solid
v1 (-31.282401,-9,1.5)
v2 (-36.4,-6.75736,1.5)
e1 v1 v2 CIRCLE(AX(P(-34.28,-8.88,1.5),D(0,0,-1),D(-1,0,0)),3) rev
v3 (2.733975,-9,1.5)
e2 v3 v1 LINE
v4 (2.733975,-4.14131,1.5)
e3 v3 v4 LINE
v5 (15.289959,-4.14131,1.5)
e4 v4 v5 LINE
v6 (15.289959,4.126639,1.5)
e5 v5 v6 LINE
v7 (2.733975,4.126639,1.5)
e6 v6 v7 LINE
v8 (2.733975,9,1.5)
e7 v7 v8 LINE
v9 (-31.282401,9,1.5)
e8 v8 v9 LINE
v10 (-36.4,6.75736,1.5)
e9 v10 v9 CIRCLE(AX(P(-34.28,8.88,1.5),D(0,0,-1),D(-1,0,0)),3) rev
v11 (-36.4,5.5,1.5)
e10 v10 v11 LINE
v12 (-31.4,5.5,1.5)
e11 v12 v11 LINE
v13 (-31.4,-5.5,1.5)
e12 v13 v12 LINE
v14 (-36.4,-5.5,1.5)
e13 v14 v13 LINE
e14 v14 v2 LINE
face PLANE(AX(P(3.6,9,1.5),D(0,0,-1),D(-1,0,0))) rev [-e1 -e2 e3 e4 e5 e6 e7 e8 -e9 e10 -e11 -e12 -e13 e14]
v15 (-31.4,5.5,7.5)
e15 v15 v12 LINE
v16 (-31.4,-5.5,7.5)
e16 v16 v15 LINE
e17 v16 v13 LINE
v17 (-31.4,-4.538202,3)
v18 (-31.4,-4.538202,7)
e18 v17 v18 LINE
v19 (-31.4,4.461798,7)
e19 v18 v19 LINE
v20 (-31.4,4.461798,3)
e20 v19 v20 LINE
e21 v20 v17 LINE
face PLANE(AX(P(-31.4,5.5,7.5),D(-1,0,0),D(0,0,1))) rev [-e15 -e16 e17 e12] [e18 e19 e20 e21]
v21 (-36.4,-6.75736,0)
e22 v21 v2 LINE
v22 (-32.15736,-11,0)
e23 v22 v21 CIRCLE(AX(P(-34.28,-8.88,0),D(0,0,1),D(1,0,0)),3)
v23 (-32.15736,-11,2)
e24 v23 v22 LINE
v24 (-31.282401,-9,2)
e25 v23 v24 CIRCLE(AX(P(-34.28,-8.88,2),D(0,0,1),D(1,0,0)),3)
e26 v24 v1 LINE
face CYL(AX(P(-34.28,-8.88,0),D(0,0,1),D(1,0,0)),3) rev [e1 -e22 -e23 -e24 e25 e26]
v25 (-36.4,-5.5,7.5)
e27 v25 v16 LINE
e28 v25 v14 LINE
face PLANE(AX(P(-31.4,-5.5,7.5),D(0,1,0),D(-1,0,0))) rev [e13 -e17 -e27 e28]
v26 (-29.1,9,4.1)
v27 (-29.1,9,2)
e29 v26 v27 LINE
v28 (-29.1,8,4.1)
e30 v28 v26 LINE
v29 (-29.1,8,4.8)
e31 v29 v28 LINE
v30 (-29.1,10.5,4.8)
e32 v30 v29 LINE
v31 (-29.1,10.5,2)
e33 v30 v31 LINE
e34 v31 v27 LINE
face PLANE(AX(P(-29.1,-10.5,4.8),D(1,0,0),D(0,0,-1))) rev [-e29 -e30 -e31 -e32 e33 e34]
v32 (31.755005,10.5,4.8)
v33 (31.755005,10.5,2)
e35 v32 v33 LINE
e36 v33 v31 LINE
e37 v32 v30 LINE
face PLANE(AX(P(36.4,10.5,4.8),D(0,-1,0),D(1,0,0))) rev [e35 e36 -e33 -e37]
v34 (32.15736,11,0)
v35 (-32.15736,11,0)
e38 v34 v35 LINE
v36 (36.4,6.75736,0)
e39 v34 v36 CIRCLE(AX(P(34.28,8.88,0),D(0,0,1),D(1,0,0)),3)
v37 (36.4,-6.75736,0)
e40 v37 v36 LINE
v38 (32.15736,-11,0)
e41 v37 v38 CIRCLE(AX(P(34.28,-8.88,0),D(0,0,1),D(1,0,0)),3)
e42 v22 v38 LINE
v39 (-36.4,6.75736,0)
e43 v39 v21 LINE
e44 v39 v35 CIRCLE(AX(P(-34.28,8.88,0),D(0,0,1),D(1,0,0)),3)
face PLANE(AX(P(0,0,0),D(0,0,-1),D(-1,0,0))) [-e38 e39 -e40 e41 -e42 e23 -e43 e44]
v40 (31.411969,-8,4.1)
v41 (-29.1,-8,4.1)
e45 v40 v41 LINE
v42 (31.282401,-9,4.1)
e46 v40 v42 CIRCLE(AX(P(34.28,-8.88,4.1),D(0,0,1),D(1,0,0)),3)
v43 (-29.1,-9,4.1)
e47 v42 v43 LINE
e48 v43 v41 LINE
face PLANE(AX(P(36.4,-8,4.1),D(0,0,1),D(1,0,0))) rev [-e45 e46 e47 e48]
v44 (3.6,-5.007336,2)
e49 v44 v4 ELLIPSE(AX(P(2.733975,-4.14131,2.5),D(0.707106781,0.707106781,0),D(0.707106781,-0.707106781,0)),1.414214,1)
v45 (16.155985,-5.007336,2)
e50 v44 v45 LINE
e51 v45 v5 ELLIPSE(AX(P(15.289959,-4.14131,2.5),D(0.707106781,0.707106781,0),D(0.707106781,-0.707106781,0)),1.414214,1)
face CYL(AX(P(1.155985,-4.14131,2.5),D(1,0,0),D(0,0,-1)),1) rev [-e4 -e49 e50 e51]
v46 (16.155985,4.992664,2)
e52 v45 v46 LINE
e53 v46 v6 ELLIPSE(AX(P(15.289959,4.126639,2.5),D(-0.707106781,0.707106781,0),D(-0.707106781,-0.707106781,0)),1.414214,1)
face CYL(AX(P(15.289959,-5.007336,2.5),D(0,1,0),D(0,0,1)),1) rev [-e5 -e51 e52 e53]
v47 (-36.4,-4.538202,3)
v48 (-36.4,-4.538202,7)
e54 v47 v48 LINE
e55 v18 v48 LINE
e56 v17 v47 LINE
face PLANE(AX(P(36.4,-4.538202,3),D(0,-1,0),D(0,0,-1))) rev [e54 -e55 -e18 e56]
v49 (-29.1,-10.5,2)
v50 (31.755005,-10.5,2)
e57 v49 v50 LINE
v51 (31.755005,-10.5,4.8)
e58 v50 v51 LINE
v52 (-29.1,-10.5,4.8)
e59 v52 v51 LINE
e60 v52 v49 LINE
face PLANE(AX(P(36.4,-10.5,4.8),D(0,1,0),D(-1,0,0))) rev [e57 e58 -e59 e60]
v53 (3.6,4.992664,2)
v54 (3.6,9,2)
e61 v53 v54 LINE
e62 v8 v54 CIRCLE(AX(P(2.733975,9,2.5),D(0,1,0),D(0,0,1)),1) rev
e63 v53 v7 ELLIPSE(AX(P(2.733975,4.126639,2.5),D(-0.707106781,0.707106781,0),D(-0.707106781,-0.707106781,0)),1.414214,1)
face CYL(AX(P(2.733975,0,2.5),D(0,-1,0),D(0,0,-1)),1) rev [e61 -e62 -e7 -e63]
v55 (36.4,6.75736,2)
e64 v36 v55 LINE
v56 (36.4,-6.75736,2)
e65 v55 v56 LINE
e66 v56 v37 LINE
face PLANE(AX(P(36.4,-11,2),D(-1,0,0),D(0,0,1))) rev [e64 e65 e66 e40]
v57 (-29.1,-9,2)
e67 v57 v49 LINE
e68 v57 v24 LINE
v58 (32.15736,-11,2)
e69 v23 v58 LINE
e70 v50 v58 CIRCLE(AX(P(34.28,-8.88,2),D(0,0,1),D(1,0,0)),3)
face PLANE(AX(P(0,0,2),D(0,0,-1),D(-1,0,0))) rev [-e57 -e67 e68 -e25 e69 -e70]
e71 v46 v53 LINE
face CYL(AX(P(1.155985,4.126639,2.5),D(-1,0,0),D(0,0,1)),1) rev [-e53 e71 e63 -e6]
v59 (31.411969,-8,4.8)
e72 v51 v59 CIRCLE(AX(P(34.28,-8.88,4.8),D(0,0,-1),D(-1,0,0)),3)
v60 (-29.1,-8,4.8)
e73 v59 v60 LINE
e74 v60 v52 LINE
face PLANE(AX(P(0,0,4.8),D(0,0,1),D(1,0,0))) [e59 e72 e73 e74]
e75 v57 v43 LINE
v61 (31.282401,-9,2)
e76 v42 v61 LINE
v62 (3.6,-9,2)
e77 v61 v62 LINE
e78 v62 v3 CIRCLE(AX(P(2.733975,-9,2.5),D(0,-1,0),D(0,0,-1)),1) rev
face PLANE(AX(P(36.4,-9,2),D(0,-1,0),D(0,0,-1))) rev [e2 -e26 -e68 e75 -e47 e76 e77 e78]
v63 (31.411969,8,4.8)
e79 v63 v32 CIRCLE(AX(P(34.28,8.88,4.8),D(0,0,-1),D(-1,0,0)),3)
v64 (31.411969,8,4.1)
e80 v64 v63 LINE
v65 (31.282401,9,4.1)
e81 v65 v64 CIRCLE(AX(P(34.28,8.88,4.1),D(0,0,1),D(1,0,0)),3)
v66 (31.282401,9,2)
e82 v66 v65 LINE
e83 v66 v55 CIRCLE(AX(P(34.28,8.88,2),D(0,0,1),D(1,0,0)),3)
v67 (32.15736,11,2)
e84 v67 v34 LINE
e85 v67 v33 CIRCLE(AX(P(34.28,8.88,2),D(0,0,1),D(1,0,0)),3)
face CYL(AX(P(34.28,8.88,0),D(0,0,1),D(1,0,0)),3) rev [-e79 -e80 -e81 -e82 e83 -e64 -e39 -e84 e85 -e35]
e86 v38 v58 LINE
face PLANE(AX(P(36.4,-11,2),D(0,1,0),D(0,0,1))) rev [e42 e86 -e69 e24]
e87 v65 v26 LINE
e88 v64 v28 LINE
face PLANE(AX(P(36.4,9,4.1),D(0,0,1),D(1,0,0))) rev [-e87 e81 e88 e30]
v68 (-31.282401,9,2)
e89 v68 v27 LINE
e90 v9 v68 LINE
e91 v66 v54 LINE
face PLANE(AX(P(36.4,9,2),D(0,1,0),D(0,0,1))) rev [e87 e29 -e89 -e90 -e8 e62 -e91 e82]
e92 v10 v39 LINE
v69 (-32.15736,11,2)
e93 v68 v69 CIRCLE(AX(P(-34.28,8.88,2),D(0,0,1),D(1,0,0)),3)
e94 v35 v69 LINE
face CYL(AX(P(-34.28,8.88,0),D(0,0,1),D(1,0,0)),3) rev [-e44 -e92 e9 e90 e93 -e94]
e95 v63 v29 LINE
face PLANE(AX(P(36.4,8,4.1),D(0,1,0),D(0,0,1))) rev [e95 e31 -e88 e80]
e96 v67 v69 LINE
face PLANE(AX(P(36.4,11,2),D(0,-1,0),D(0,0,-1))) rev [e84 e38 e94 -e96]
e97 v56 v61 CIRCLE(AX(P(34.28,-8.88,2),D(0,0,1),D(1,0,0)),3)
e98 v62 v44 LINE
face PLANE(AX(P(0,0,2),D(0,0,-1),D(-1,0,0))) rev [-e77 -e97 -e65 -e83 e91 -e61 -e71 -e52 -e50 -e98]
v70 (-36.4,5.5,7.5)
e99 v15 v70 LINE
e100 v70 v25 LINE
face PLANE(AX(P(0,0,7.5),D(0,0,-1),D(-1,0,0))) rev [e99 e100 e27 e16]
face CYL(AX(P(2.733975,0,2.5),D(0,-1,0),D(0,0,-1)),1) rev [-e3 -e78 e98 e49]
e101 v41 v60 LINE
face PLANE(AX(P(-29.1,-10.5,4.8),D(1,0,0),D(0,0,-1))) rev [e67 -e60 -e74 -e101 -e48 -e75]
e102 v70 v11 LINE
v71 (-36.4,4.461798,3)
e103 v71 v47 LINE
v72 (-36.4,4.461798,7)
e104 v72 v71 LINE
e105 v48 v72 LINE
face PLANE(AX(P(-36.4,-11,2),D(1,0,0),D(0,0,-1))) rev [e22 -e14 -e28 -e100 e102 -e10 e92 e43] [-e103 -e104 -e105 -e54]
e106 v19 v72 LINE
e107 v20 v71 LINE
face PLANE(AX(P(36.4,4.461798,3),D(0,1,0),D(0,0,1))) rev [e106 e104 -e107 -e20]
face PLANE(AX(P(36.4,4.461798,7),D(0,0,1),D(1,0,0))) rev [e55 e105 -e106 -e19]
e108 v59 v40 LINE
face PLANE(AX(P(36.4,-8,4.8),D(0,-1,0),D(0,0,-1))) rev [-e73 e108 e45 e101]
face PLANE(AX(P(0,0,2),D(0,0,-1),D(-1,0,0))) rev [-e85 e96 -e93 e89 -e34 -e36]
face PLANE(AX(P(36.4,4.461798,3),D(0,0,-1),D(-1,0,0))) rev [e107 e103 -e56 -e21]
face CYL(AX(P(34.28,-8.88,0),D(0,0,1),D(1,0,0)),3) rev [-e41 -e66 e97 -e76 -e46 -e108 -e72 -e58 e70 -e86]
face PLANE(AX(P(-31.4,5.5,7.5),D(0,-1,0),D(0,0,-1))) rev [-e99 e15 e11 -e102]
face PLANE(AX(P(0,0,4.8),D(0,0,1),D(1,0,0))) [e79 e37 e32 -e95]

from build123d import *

# Parameters (mm, degrees)
SKIZZE1_W                       = 22
SKIZZE1_H                       = 72.8
AUFSATZ_LINEAR_AUSTRAGEN1_DEPTH = 2
SKIZZE2_R                       = 3
SCHNITT_LINEAR_AUSTRAGEN1_DEPTH = 2
SKIZZE3_W                       = 65.5
SKIZZE3_H                       = 21
AUFSATZ_LINEAR_AUSTRAGEN2_DEPTH = 2.8
SCHNITT_LINEAR_AUSTRAGEN2_DEPTH = 67.590464783
SKIZZE5_R                       = 3
SCHNITT_LINEAR_AUSTRAGEN4_DEPTH = 39.128729326
SKIZZE6_W                       = 18
SKIZZE6_H                       = 1
SCHNITT_LINEAR_AUSTRAGEN5_DEPTH = 40
SKIZZE8_W                       = 15
SKIZZE8_H                       = 10
SCHNITT_LINEAR_AUSTRAGEN6_DEPTH = 0.5
VERRUNDUNG3_R                   = 1
SKIZZE9_W                       = 5
SKIZZE9_H                       = 11
AUFSATZ_LINEAR_AUSTRAGEN3_DEPTH = 6
SKIZZE10_W                      = 9
SKIZZE10_H                      = 4
SCHNITT_LINEAR_AUSTRAGEN7_DEPTH = 75.007364498


with BuildPart() as part:
    # Skizze1 → Aufsatz-Linear austragen1 (new body)
    with BuildSketch(Plane(origin=(0, 0, 0), x_dir=(0, 1, 0), z_dir=(0, 0, 1))):
        Rectangle(SKIZZE1_W, SKIZZE1_H)
    extrude(amount=AUFSATZ_LINEAR_AUSTRAGEN1_DEPTH)

    # Skizze2 → Schnitt-Linear austragen1 (cut)
    with BuildSketch(Plane.XY.offset(2)):
        with Locations((-34.28, 8.88)):
            Circle(SKIZZE2_R)
        with Locations((-34.28, -8.88)):
            Circle(SKIZZE2_R)
        with Locations((34.28, -8.88)):
            Circle(SKIZZE2_R)
        with Locations((34.28, 8.88)):
            Circle(SKIZZE2_R)
    extrude(amount=-SCHNITT_LINEAR_AUSTRAGEN1_DEPTH, mode=Mode.SUBTRACT)

    # Skizze3 → Aufsatz-Linear austragen2 (add)
    with BuildSketch(Plane.XY.offset(2)):
        with Locations((3.65, 0)):
            Rectangle(SKIZZE3_W, SKIZZE3_H)
    extrude(amount=AUFSATZ_LINEAR_AUSTRAGEN2_DEPTH)

    # Skizze4 → Schnitt-Linear austragen2 (cut, through all)
    with BuildSketch(Plane(origin=(-29.1, 0, 0), x_dir=(0, -1, 0), z_dir=(-1, 0, 0))):
        Polygon((-8, 4.8), (8, 4.8), (8, 4.1), (9, 4.1), (9, 2), (-9, 2), (-9, 4.1), (-8, 4.1), align=None)
    extrude(amount=-SCHNITT_LINEAR_AUSTRAGEN2_DEPTH, mode=Mode.SUBTRACT)

    # Skizze5 → Schnitt-Linear austragen4 (cut, through all)
    with BuildSketch(Plane(origin=(0, 0, 2), x_dir=(1, 0, 0), z_dir=(0, 0, -1))):
        with Locations((34.28, -8.88)):
            Circle(SKIZZE5_R)
        with Locations((34.28, 8.88)):
            Circle(SKIZZE5_R)
    extrude(amount=-SCHNITT_LINEAR_AUSTRAGEN4_DEPTH, mode=Mode.SUBTRACT)

    # Skizze6 → Schnitt-Linear austragen5 (cut)
    with BuildSketch(Plane(origin=(-36.4, 0, 0), x_dir=(0, -1, 0), z_dir=(-1, 0, 0))):
        with Locations((0, 2)):
            Rectangle(SKIZZE6_W, SKIZZE6_H)
    extrude(amount=-SCHNITT_LINEAR_AUSTRAGEN5_DEPTH, mode=Mode.SUBTRACT)

    # Skizze8 → Schnitt-Linear austragen6 (cut)
    with BuildSketch(Plane.XY.offset(2)):
        with Locations((8.655984658, -0.007335612)):
            Rectangle(SKIZZE8_W, SKIZZE8_H)
    extrude(amount=-SCHNITT_LINEAR_AUSTRAGEN6_DEPTH, mode=Mode.SUBTRACT)

    # Verrundung3
    # the kernel refuses this fillet: 1 mm, written as the material it adds along each edge
    with BuildSketch(Plane(origin=(3.6, -9, 1.5), x_dir=(0, 0, 1), z_dir=(0, 1, 0))) as verrundung3_piece_1:
        with BuildLine():
            CenterArc((1, -0.866025404), VERRUNDUNG3_R, 120, 60)
            Line((0, -0.866025404), (-0.02, -0.866025404))
            Line((-0.02, -0.866025404), (-0.02, 0))
            Line((-0.02, 0), (0, 0.02))
            ThreePointArc((0, 0.02), (0.25, 0.02), (0.49, 0.017320508))
            Line((0.49, 0.017320508), (0.5, 0))
        make_face()
    extrude(amount=3.992664388)
    with BuildSketch(Plane(origin=(3.6, -5.007335612, 1.5), x_dir=(0, 0, 1), z_dir=(1, 0, 0)), Plane(origin=(16.155984658, 4.992664388, 1.5), x_dir=(0, 0, 1), z_dir=(-1, 0, 0))) as verrundung3_piece_2:
        with BuildLine():
            CenterArc((1, -0.866025404), VERRUNDUNG3_R, 120, 60)
            Line((0, -0.866025404), (-0.02, -0.866025404))
            Line((-0.02, -0.866025404), (-0.02, 0))
            Line((-0.02, 0), (0, 0.02))
            ThreePointArc((0, 0.02), (0.25, 0.02), (0.49, 0.017320508))
            Line((0.49, 0.017320508), (0.5, 0))
        make_face()
    extrude(amount=12.555984658)
    with BuildSketch(Plane(origin=(3.6, 4.992664388, 1.5), x_dir=(0, 0, 1), z_dir=(0, 1, 0))) as verrundung3_piece_3:
        with BuildLine():
            CenterArc((1, -0.866025404), VERRUNDUNG3_R, 120, 60)
            Line((0, -0.866025404), (-0.02, -0.866025404))
            Line((-0.02, -0.866025404), (-0.02, 0))
            Line((-0.02, 0), (0, 0.02))
            ThreePointArc((0, 0.02), (0.25, 0.02), (0.49, 0.017320508))
            Line((0.49, 0.017320508), (0.5, 0))
        make_face()
    extrude(amount=4.007335612)
    with BuildSketch(Plane(origin=(16.155984658, -5.007335612, 1.5), x_dir=(0, 0, 1), z_dir=(0, 1, 0))) as verrundung3_piece_4:
        with BuildLine():
            CenterArc((1, -0.866025404), VERRUNDUNG3_R, 120, 60)
            Line((0, -0.866025404), (-0.02, -0.866025404))
            Line((-0.02, -0.866025404), (-0.02, 0))
            Line((-0.02, 0), (0, 0.02))
            ThreePointArc((0, 0.02), (0.25, 0.02), (0.49, 0.017320508))
            Line((0.49, 0.017320508), (0.5, 0))
        make_face()
    extrude(amount=10)
    with BuildSketch(Plane(origin=(3.6, -9, 1.5), x_dir=(0, 0, 1), z_dir=(0, 1, 0))) as verrundung3_piece_5a_section:
        with BuildLine():
            CenterArc((1, -0.866025404), VERRUNDUNG3_R, 120, 60)
            Line((0, -0.866025404), (-0.02, -0.866025404))
            Line((-0.02, -0.866025404), (-0.02, 0))
            Line((-0.02, 0), (0, 0.02))
            ThreePointArc((0, 0.02), (0.25, 0.02), (0.49, 0.017320508))
            Line((0.49, 0.017320508), (0.5, 0))
        make_face()
    verrundung3_piece_5a = extrude(amount=6.157727897, mode=Mode.PRIVATE)
    verrundung3_piece_5a = split(verrundung3_piece_5a, bisect_by=Plane(origin=(3.383689554, -5.007335612, 1.629516711), z_dir=(0, 1, 0)), keep=Keep.TOP, mode=Mode.PRIVATE)
    with BuildSketch(Plane(origin=(1.434936491, -5.007335612, 1.5), x_dir=(0, 0, 1), z_dir=(1, 0, 0))) as verrundung3_piece_5b_section:
        with BuildLine():
            CenterArc((1, -0.866025404), VERRUNDUNG3_R, 120, 60)
            Line((0, -0.866025404), (-0.02, -0.866025404))
            Line((-0.02, -0.866025404), (-0.02, 0))
            Line((-0.02, 0), (0, 0.02))
            ThreePointArc((0, 0.02), (0.25, 0.02), (0.49, 0.017320508))
            Line((0.49, 0.017320508), (0.5, 0))
        make_face()
    verrundung3_piece_5b = extrude(amount=14.721048168, mode=Mode.PRIVATE)
    verrundung3_piece_5b = split(verrundung3_piece_5b, bisect_by=Plane(origin=(3.6, -4.791025166, 1.629516711), z_dir=(-1, 0, 0)), keep=Keep.TOP, mode=Mode.PRIVATE)
    verrundung3_piece_5 = verrundung3_piece_5a & verrundung3_piece_5b
    add(verrundung3_piece_5)
    with BuildSketch(Plane(origin=(3.6, -5.007335612, 1.5), x_dir=(0, 0, 1), z_dir=(1, 0, 0))) as verrundung3_piece_6a_section:
        with BuildLine():
            CenterArc((1, -0.866025404), VERRUNDUNG3_R, 120, 60)
            Line((0, -0.866025404), (-0.02, -0.866025404))
            Line((-0.02, -0.866025404), (-0.02, 0))
            Line((-0.02, 0), (0, 0.02))
            ThreePointArc((0, 0.02), (0.25, 0.02), (0.49, 0.017320508))
            Line((0.49, 0.017320508), (0.5, 0))
        make_face()
    verrundung3_piece_6a = extrude(amount=14.721048168, mode=Mode.PRIVATE)
    verrundung3_piece_6a = split(verrundung3_piece_6a, bisect_by=Plane(origin=(16.155984658, -4.791025166, 1.629516711), z_dir=(1, 0, 0)), keep=Keep.TOP, mode=Mode.PRIVATE)
    with BuildSketch(Plane(origin=(16.155984658, -7.172399122, 1.5), x_dir=(0, 0, 1), z_dir=(0, 1, 0))) as verrundung3_piece_6b_section:
        with BuildLine():
            CenterArc((1, -0.866025404), VERRUNDUNG3_R, 120, 60)
            Line((0, -0.866025404), (-0.02, -0.866025404))
            Line((-0.02, -0.866025404), (-0.02, 0))
            Line((-0.02, 0), (0, 0.02))
            ThreePointArc((0, 0.02), (0.25, 0.02), (0.49, 0.017320508))
            Line((0.49, 0.017320508), (0.5, 0))
        make_face()
    verrundung3_piece_6b = extrude(amount=12.165063509, mode=Mode.PRIVATE)
    verrundung3_piece_6b = split(verrundung3_piece_6b, bisect_by=Plane(origin=(15.939674213, -5.007335612, 1.629516711), z_dir=(0, -1, 0)), keep=Keep.TOP, mode=Mode.PRIVATE)
    verrundung3_piece_6 = verrundung3_piece_6a & verrundung3_piece_6b
    add(verrundung3_piece_6)
    with BuildSketch(Plane(origin=(16.155984658, 4.992664388, 1.5), x_dir=(0, 0, 1), z_dir=(-1, 0, 0))) as verrundung3_piece_7a_section:
        with BuildLine():
            CenterArc((1, -0.866025404), VERRUNDUNG3_R, 120, 60)
            Line((0, -0.866025404), (-0.02, -0.866025404))
            Line((-0.02, -0.866025404), (-0.02, 0))
            Line((-0.02, 0), (0, 0.02))
            ThreePointArc((0, 0.02), (0.25, 0.02), (0.49, 0.017320508))
            Line((0.49, 0.017320508), (0.5, 0))
        make_face()
    verrundung3_piece_7a = extrude(amount=14.721048168, mode=Mode.PRIVATE)
    verrundung3_piece_7a = split(verrundung3_piece_7a, bisect_by=Plane(origin=(3.6, 4.776353942, 1.629516711), z_dir=(-1, 0, 0)), keep=Keep.TOP, mode=Mode.PRIVATE)
    with BuildSketch(Plane(origin=(3.6, 2.827600878, 1.5), x_dir=(0, 0, 1), z_dir=(0, 1, 0))) as verrundung3_piece_7b_section:
        with BuildLine():
            CenterArc((1, -0.866025404), VERRUNDUNG3_R, 120, 60)
            Line((0, -0.866025404), (-0.02, -0.866025404))
            Line((-0.02, -0.866025404), (-0.02, 0))
            Line((-0.02, 0), (0, 0.02))
            ThreePointArc((0, 0.02), (0.25, 0.02), (0.49, 0.017320508))
            Line((0.49, 0.017320508), (0.5, 0))
        make_face()
    verrundung3_piece_7b = extrude(amount=6.172399122, mode=Mode.PRIVATE)
    verrundung3_piece_7b = split(verrundung3_piece_7b, bisect_by=Plane(origin=(3.383689554, 4.992664388, 1.629516711), z_dir=(0, -1, 0)), keep=Keep.TOP, mode=Mode.PRIVATE)
    verrundung3_piece_7 = verrundung3_piece_7a & verrundung3_piece_7b
    add(verrundung3_piece_7)
    with BuildSketch(Plane(origin=(16.155984658, -5.007335612, 1.5), x_dir=(0, 0, 1), z_dir=(0, 1, 0))) as verrundung3_piece_8a_section:
        with BuildLine():
            CenterArc((1, -0.866025404), VERRUNDUNG3_R, 120, 60)
            Line((0, -0.866025404), (-0.02, -0.866025404))
            Line((-0.02, -0.866025404), (-0.02, 0))
            Line((-0.02, 0), (0, 0.02))
            ThreePointArc((0, 0.02), (0.25, 0.02), (0.49, 0.017320508))
            Line((0.49, 0.017320508), (0.5, 0))
        make_face()
    verrundung3_piece_8a = extrude(amount=12.165063509, mode=Mode.PRIVATE)
    verrundung3_piece_8a = split(verrundung3_piece_8a, bisect_by=Plane(origin=(15.939674213, 4.992664388, 1.629516711), z_dir=(0, 1, 0)), keep=Keep.TOP, mode=Mode.PRIVATE)
    with BuildSketch(Plane(origin=(18.321048168, 4.992664388, 1.5), x_dir=(0, 0, 1), z_dir=(-1, 0, 0))) as verrundung3_piece_8b_section:
        with BuildLine():
            CenterArc((1, -0.866025404), VERRUNDUNG3_R, 120, 60)
            Line((0, -0.866025404), (-0.02, -0.866025404))
            Line((-0.02, -0.866025404), (-0.02, 0))
            Line((-0.02, 0), (0, 0.02))
            ThreePointArc((0, 0.02), (0.25, 0.02), (0.49, 0.017320508))
            Line((0.49, 0.017320508), (0.5, 0))
        make_face()
    verrundung3_piece_8b = extrude(amount=14.721048168, mode=Mode.PRIVATE)
    verrundung3_piece_8b = split(verrundung3_piece_8b, bisect_by=Plane(origin=(16.155984658, 4.776353942, 1.629516711), z_dir=(1, 0, 0)), keep=Keep.TOP, mode=Mode.PRIVATE)
    verrundung3_piece_8 = verrundung3_piece_8a & verrundung3_piece_8b
    add(verrundung3_piece_8)

    # Skizze9 → Aufsatz-Linear austragen3 (add)
    with BuildSketch(Plane.XY.offset(1.5)):
        with Locations((-33.9, 0)):
            Rectangle(SKIZZE9_W, SKIZZE9_H)
    extrude(amount=AUFSATZ_LINEAR_AUSTRAGEN3_DEPTH)

    # Skizze10 → Schnitt-Linear austragen7 (cut, through all)
    with BuildSketch(Plane(origin=(-36.4, 0, 0), x_dir=(0, -1, 0), z_dir=(-1, 0, 0))):
        with Locations((0.038201858, 5)):
            Rectangle(SKIZZE10_W, SKIZZE10_H)
    extrude(amount=-SCHNITT_LINEAR_AUSTRAGEN7_DEPTH, mode=Mode.SUBTRACT)


solid = part.part
